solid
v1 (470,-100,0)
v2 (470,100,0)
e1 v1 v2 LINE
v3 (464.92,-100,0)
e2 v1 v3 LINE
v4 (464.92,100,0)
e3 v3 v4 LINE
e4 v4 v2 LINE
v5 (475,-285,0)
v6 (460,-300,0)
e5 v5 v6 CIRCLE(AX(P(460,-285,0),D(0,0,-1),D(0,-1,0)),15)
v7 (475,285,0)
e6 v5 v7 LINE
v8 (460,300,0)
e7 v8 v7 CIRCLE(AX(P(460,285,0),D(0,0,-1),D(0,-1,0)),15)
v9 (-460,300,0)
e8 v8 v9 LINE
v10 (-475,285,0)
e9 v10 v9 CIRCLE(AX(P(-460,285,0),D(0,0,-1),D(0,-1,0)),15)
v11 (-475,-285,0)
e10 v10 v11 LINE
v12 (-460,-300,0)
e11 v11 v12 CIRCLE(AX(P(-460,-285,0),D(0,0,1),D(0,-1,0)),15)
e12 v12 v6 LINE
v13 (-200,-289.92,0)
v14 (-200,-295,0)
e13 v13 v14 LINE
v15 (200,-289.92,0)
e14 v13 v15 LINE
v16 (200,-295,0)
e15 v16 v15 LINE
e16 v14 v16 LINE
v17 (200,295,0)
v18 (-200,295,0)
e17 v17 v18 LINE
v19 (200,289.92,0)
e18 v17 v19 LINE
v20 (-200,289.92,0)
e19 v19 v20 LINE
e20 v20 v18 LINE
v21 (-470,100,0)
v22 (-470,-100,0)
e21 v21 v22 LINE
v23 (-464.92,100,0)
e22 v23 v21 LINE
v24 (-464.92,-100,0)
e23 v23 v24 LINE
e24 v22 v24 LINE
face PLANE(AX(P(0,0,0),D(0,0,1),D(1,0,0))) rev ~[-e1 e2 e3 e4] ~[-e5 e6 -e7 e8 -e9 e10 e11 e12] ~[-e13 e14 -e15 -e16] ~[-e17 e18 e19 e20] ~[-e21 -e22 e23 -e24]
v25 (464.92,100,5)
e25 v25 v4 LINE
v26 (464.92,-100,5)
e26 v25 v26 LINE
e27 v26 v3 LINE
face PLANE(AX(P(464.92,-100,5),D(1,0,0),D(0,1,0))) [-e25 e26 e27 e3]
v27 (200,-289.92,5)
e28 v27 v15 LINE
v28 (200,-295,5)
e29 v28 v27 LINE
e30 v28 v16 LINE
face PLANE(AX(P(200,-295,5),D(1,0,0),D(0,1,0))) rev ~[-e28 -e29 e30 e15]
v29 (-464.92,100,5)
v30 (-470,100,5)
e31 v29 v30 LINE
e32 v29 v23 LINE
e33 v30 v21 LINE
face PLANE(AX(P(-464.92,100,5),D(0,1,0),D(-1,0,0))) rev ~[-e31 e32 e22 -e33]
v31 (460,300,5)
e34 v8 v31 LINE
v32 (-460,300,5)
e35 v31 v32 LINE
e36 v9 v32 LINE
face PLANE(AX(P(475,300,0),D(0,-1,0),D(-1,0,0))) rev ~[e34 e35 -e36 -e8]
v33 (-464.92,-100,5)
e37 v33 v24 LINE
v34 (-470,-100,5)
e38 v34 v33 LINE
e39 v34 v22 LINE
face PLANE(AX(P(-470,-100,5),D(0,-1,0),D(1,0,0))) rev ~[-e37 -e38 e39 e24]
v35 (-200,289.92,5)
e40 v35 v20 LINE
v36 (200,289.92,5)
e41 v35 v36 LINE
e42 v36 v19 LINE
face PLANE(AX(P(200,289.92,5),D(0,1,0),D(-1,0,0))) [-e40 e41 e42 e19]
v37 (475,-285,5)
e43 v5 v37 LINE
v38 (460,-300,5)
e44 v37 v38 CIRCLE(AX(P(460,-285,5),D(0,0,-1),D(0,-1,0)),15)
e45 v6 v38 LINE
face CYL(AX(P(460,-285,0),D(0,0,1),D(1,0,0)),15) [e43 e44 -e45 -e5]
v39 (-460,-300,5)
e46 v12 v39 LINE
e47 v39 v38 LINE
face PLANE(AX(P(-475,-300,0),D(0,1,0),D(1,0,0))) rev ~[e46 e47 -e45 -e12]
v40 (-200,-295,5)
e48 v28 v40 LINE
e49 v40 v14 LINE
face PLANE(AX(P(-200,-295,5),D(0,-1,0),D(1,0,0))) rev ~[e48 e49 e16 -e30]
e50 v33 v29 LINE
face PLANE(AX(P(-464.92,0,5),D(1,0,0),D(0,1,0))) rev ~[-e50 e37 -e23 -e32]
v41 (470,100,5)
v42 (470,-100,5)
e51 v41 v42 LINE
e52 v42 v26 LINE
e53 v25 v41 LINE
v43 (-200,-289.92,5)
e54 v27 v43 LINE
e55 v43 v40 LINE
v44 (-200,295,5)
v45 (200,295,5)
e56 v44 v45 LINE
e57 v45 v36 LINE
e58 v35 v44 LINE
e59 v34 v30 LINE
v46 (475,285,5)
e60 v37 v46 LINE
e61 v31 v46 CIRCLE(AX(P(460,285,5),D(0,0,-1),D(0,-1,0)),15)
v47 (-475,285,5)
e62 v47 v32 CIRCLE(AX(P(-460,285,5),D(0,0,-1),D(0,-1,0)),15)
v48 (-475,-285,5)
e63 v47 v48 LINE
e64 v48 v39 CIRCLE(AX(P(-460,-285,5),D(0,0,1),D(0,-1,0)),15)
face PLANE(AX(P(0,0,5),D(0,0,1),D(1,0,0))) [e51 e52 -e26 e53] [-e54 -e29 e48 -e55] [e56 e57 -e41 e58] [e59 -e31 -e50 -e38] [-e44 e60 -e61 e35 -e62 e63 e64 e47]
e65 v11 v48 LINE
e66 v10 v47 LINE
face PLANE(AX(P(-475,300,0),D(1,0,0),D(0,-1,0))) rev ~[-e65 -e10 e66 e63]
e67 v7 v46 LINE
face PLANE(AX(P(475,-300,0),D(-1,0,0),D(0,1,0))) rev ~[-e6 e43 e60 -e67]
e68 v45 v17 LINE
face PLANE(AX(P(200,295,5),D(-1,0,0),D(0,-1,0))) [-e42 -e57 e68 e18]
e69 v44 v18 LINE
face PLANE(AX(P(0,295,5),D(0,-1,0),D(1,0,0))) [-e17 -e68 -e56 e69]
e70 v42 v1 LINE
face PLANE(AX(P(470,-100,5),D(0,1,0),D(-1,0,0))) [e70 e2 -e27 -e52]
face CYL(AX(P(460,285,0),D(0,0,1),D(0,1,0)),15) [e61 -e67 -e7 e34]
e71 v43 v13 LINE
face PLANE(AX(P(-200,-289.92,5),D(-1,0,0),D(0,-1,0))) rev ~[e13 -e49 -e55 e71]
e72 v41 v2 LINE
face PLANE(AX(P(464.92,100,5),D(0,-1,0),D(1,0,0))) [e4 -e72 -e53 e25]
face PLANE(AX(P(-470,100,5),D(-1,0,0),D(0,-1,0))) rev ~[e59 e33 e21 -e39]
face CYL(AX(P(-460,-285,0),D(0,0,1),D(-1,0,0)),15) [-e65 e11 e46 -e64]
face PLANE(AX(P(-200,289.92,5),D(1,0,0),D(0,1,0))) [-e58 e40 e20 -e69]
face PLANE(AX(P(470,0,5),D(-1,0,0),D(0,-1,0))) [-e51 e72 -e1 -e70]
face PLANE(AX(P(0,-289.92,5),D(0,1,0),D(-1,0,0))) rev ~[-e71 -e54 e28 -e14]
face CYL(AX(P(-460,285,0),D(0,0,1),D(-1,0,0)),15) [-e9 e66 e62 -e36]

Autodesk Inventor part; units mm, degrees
ref_plane "YZ Plane" through (0, 0, 0) normal (1, 0, 0) x (0, 1, 0)
ref_plane "XZ Plane" through (0, 0, 0) normal (0, 1, 0) x (-1, 0, 0)
ref_plane "XY Plane" through (0, 0, 0) normal (0, 0, 1) x (1, 0, 0)
sketch "Sketch1" plane through (0, 0, 0) normal (0, 0, 1) x (1, 0, 0)
  line L0 (-475, -300) -> (475, -300)
  line L1 (475, -300) -> (475, 300)
  line L2 (475, 300) -> (-475, 300)
  line L3 (-475, 300) -> (-475, -300)
  line L4 (-475, -300) -> (475, 300) construction
  line L5 (475, -300) -> (-475, 300) construction
  point P0 (0, 0)
  dimension "d0" = 950
  dimension "d1" = 600
extrude "Plate1" add sketch "Sketch1" along normal blind 5
fillet "Corner Round1" radius 15 4 edges at (475, 300, 2.5) (475, -300, 2.5) (-475, -300, 2.5) (-475, 300, 2.5)
sketch "Sketch2" plane through (0, 0, 5) normal (0, 0, 1) x (1, 0, 0)
  line L0 (-475, 300) -> (-475, -300)
  line L1 (-475, 0) -> (475, 0)
  line L2 (475, -300) -> (475, 300)
  line L3 (475, 300) -> (-475, 300)
  line L4 (0, 300) -> (0, -300)
  line L5 (475, -300) -> (-475, -300)
  line L6 (-200, 295) -> (200, 295)
  line L7 (200, 295) -> (200, 289.92)
  line L8 (200, 289.92) -> (-200, 289.92)
  line L9 (-200, 289.92) -> (-200, 295)
  line L10 (-200, 295) -> (200, 289.92) construction
  line L11 (200, 295) -> (-200, 289.92) construction
  line L12 (-475, 300) -> (475, 300)
  line L13 (-470, -100) -> (-464.92, -100)
  line L14 (-464.92, -100) -> (-464.92, 100)
  line L15 (-464.92, 100) -> (-470, 100)
  line L16 (-470, 100) -> (-470, -100)
  line L17 (-470, -100) -> (-464.92, 100) construction
  line L18 (-464.92, -100) -> (-470, 100) construction
  line L19 (-475, -300) -> (-475, 300)
  line L20 (-200, -289.92) -> (-200, -295)
  line L21 (-200, -295) -> (200, -295)
  line L22 (200, -295) -> (200, -289.92)
  line L23 (-200, -295) -> (200, -289.92) construction
  line L24 (200, -295) -> (-200, -289.92) construction
  line L25 (200, -289.92) -> (-200, -289.92)
  line L26 (464.92, 100) -> (470, 100)
  line L27 (464.92, -100) -> (464.92, 100)
  line L28 (470, -100) -> (464.92, 100) construction
  line L29 (470, -100) -> (464.92, -100)
  line L30 (464.92, -100) -> (470, 100) construction
  line L31 (470, 100) -> (470, -100)
  point P0 (0, 0)
  point P1 (44.3571, 22.9179)
  point P2 (0, 292.46)
  point P3 (0, 295)
  point P4 (-467.46, 0)
  point P5 (-470, 0)
  point P6 (0, -292.46)
  point P7 (0, -295)
  point P8 (0, -300)
  point P9 (0, -300)
  point P10 (467.46, 0)
  point P11 (470, 0)
  point P12 (0, 0)
  dimension "d4" = 5.08
  dimension "d5" = 400
  dimension "d6" = 5
  dimension "d7" = 5.08
  dimension "d8" = 200
  dimension "d9" = 5
  dimension "d10" = 950
  dimension "d11" = 600
extrude "Cut1" cut sketch "Sketch2" against normal blind 5 contours L16 L15 L14 L1 | L1 L14 L13 L16 | L6 L7 L8 L4 | L4 L8 L9 L6 | L21 L20 L25 L4 | L4 L25 L22 L21 | L31 L29 L27 L1 | L1 L27 L26 L31
equation "\"d14\" = Thickness"
equation "\"d2\" = Thickness"
equation "\"BendRadius\" = Thickness"
equation "\"BendReliefWidth\" = Thickness"
equation "\"BendReliefDepth\" = 0.5 * Thickness"
equation "\"TransitionRadius\" = BendRadius"
equation "\"JacobiRadiusSize\" = BendRadius"
equation "\"GapSize\" = Thickness"
equation "\"Thickness\" = 5"
properties part number "Base Full Game"
